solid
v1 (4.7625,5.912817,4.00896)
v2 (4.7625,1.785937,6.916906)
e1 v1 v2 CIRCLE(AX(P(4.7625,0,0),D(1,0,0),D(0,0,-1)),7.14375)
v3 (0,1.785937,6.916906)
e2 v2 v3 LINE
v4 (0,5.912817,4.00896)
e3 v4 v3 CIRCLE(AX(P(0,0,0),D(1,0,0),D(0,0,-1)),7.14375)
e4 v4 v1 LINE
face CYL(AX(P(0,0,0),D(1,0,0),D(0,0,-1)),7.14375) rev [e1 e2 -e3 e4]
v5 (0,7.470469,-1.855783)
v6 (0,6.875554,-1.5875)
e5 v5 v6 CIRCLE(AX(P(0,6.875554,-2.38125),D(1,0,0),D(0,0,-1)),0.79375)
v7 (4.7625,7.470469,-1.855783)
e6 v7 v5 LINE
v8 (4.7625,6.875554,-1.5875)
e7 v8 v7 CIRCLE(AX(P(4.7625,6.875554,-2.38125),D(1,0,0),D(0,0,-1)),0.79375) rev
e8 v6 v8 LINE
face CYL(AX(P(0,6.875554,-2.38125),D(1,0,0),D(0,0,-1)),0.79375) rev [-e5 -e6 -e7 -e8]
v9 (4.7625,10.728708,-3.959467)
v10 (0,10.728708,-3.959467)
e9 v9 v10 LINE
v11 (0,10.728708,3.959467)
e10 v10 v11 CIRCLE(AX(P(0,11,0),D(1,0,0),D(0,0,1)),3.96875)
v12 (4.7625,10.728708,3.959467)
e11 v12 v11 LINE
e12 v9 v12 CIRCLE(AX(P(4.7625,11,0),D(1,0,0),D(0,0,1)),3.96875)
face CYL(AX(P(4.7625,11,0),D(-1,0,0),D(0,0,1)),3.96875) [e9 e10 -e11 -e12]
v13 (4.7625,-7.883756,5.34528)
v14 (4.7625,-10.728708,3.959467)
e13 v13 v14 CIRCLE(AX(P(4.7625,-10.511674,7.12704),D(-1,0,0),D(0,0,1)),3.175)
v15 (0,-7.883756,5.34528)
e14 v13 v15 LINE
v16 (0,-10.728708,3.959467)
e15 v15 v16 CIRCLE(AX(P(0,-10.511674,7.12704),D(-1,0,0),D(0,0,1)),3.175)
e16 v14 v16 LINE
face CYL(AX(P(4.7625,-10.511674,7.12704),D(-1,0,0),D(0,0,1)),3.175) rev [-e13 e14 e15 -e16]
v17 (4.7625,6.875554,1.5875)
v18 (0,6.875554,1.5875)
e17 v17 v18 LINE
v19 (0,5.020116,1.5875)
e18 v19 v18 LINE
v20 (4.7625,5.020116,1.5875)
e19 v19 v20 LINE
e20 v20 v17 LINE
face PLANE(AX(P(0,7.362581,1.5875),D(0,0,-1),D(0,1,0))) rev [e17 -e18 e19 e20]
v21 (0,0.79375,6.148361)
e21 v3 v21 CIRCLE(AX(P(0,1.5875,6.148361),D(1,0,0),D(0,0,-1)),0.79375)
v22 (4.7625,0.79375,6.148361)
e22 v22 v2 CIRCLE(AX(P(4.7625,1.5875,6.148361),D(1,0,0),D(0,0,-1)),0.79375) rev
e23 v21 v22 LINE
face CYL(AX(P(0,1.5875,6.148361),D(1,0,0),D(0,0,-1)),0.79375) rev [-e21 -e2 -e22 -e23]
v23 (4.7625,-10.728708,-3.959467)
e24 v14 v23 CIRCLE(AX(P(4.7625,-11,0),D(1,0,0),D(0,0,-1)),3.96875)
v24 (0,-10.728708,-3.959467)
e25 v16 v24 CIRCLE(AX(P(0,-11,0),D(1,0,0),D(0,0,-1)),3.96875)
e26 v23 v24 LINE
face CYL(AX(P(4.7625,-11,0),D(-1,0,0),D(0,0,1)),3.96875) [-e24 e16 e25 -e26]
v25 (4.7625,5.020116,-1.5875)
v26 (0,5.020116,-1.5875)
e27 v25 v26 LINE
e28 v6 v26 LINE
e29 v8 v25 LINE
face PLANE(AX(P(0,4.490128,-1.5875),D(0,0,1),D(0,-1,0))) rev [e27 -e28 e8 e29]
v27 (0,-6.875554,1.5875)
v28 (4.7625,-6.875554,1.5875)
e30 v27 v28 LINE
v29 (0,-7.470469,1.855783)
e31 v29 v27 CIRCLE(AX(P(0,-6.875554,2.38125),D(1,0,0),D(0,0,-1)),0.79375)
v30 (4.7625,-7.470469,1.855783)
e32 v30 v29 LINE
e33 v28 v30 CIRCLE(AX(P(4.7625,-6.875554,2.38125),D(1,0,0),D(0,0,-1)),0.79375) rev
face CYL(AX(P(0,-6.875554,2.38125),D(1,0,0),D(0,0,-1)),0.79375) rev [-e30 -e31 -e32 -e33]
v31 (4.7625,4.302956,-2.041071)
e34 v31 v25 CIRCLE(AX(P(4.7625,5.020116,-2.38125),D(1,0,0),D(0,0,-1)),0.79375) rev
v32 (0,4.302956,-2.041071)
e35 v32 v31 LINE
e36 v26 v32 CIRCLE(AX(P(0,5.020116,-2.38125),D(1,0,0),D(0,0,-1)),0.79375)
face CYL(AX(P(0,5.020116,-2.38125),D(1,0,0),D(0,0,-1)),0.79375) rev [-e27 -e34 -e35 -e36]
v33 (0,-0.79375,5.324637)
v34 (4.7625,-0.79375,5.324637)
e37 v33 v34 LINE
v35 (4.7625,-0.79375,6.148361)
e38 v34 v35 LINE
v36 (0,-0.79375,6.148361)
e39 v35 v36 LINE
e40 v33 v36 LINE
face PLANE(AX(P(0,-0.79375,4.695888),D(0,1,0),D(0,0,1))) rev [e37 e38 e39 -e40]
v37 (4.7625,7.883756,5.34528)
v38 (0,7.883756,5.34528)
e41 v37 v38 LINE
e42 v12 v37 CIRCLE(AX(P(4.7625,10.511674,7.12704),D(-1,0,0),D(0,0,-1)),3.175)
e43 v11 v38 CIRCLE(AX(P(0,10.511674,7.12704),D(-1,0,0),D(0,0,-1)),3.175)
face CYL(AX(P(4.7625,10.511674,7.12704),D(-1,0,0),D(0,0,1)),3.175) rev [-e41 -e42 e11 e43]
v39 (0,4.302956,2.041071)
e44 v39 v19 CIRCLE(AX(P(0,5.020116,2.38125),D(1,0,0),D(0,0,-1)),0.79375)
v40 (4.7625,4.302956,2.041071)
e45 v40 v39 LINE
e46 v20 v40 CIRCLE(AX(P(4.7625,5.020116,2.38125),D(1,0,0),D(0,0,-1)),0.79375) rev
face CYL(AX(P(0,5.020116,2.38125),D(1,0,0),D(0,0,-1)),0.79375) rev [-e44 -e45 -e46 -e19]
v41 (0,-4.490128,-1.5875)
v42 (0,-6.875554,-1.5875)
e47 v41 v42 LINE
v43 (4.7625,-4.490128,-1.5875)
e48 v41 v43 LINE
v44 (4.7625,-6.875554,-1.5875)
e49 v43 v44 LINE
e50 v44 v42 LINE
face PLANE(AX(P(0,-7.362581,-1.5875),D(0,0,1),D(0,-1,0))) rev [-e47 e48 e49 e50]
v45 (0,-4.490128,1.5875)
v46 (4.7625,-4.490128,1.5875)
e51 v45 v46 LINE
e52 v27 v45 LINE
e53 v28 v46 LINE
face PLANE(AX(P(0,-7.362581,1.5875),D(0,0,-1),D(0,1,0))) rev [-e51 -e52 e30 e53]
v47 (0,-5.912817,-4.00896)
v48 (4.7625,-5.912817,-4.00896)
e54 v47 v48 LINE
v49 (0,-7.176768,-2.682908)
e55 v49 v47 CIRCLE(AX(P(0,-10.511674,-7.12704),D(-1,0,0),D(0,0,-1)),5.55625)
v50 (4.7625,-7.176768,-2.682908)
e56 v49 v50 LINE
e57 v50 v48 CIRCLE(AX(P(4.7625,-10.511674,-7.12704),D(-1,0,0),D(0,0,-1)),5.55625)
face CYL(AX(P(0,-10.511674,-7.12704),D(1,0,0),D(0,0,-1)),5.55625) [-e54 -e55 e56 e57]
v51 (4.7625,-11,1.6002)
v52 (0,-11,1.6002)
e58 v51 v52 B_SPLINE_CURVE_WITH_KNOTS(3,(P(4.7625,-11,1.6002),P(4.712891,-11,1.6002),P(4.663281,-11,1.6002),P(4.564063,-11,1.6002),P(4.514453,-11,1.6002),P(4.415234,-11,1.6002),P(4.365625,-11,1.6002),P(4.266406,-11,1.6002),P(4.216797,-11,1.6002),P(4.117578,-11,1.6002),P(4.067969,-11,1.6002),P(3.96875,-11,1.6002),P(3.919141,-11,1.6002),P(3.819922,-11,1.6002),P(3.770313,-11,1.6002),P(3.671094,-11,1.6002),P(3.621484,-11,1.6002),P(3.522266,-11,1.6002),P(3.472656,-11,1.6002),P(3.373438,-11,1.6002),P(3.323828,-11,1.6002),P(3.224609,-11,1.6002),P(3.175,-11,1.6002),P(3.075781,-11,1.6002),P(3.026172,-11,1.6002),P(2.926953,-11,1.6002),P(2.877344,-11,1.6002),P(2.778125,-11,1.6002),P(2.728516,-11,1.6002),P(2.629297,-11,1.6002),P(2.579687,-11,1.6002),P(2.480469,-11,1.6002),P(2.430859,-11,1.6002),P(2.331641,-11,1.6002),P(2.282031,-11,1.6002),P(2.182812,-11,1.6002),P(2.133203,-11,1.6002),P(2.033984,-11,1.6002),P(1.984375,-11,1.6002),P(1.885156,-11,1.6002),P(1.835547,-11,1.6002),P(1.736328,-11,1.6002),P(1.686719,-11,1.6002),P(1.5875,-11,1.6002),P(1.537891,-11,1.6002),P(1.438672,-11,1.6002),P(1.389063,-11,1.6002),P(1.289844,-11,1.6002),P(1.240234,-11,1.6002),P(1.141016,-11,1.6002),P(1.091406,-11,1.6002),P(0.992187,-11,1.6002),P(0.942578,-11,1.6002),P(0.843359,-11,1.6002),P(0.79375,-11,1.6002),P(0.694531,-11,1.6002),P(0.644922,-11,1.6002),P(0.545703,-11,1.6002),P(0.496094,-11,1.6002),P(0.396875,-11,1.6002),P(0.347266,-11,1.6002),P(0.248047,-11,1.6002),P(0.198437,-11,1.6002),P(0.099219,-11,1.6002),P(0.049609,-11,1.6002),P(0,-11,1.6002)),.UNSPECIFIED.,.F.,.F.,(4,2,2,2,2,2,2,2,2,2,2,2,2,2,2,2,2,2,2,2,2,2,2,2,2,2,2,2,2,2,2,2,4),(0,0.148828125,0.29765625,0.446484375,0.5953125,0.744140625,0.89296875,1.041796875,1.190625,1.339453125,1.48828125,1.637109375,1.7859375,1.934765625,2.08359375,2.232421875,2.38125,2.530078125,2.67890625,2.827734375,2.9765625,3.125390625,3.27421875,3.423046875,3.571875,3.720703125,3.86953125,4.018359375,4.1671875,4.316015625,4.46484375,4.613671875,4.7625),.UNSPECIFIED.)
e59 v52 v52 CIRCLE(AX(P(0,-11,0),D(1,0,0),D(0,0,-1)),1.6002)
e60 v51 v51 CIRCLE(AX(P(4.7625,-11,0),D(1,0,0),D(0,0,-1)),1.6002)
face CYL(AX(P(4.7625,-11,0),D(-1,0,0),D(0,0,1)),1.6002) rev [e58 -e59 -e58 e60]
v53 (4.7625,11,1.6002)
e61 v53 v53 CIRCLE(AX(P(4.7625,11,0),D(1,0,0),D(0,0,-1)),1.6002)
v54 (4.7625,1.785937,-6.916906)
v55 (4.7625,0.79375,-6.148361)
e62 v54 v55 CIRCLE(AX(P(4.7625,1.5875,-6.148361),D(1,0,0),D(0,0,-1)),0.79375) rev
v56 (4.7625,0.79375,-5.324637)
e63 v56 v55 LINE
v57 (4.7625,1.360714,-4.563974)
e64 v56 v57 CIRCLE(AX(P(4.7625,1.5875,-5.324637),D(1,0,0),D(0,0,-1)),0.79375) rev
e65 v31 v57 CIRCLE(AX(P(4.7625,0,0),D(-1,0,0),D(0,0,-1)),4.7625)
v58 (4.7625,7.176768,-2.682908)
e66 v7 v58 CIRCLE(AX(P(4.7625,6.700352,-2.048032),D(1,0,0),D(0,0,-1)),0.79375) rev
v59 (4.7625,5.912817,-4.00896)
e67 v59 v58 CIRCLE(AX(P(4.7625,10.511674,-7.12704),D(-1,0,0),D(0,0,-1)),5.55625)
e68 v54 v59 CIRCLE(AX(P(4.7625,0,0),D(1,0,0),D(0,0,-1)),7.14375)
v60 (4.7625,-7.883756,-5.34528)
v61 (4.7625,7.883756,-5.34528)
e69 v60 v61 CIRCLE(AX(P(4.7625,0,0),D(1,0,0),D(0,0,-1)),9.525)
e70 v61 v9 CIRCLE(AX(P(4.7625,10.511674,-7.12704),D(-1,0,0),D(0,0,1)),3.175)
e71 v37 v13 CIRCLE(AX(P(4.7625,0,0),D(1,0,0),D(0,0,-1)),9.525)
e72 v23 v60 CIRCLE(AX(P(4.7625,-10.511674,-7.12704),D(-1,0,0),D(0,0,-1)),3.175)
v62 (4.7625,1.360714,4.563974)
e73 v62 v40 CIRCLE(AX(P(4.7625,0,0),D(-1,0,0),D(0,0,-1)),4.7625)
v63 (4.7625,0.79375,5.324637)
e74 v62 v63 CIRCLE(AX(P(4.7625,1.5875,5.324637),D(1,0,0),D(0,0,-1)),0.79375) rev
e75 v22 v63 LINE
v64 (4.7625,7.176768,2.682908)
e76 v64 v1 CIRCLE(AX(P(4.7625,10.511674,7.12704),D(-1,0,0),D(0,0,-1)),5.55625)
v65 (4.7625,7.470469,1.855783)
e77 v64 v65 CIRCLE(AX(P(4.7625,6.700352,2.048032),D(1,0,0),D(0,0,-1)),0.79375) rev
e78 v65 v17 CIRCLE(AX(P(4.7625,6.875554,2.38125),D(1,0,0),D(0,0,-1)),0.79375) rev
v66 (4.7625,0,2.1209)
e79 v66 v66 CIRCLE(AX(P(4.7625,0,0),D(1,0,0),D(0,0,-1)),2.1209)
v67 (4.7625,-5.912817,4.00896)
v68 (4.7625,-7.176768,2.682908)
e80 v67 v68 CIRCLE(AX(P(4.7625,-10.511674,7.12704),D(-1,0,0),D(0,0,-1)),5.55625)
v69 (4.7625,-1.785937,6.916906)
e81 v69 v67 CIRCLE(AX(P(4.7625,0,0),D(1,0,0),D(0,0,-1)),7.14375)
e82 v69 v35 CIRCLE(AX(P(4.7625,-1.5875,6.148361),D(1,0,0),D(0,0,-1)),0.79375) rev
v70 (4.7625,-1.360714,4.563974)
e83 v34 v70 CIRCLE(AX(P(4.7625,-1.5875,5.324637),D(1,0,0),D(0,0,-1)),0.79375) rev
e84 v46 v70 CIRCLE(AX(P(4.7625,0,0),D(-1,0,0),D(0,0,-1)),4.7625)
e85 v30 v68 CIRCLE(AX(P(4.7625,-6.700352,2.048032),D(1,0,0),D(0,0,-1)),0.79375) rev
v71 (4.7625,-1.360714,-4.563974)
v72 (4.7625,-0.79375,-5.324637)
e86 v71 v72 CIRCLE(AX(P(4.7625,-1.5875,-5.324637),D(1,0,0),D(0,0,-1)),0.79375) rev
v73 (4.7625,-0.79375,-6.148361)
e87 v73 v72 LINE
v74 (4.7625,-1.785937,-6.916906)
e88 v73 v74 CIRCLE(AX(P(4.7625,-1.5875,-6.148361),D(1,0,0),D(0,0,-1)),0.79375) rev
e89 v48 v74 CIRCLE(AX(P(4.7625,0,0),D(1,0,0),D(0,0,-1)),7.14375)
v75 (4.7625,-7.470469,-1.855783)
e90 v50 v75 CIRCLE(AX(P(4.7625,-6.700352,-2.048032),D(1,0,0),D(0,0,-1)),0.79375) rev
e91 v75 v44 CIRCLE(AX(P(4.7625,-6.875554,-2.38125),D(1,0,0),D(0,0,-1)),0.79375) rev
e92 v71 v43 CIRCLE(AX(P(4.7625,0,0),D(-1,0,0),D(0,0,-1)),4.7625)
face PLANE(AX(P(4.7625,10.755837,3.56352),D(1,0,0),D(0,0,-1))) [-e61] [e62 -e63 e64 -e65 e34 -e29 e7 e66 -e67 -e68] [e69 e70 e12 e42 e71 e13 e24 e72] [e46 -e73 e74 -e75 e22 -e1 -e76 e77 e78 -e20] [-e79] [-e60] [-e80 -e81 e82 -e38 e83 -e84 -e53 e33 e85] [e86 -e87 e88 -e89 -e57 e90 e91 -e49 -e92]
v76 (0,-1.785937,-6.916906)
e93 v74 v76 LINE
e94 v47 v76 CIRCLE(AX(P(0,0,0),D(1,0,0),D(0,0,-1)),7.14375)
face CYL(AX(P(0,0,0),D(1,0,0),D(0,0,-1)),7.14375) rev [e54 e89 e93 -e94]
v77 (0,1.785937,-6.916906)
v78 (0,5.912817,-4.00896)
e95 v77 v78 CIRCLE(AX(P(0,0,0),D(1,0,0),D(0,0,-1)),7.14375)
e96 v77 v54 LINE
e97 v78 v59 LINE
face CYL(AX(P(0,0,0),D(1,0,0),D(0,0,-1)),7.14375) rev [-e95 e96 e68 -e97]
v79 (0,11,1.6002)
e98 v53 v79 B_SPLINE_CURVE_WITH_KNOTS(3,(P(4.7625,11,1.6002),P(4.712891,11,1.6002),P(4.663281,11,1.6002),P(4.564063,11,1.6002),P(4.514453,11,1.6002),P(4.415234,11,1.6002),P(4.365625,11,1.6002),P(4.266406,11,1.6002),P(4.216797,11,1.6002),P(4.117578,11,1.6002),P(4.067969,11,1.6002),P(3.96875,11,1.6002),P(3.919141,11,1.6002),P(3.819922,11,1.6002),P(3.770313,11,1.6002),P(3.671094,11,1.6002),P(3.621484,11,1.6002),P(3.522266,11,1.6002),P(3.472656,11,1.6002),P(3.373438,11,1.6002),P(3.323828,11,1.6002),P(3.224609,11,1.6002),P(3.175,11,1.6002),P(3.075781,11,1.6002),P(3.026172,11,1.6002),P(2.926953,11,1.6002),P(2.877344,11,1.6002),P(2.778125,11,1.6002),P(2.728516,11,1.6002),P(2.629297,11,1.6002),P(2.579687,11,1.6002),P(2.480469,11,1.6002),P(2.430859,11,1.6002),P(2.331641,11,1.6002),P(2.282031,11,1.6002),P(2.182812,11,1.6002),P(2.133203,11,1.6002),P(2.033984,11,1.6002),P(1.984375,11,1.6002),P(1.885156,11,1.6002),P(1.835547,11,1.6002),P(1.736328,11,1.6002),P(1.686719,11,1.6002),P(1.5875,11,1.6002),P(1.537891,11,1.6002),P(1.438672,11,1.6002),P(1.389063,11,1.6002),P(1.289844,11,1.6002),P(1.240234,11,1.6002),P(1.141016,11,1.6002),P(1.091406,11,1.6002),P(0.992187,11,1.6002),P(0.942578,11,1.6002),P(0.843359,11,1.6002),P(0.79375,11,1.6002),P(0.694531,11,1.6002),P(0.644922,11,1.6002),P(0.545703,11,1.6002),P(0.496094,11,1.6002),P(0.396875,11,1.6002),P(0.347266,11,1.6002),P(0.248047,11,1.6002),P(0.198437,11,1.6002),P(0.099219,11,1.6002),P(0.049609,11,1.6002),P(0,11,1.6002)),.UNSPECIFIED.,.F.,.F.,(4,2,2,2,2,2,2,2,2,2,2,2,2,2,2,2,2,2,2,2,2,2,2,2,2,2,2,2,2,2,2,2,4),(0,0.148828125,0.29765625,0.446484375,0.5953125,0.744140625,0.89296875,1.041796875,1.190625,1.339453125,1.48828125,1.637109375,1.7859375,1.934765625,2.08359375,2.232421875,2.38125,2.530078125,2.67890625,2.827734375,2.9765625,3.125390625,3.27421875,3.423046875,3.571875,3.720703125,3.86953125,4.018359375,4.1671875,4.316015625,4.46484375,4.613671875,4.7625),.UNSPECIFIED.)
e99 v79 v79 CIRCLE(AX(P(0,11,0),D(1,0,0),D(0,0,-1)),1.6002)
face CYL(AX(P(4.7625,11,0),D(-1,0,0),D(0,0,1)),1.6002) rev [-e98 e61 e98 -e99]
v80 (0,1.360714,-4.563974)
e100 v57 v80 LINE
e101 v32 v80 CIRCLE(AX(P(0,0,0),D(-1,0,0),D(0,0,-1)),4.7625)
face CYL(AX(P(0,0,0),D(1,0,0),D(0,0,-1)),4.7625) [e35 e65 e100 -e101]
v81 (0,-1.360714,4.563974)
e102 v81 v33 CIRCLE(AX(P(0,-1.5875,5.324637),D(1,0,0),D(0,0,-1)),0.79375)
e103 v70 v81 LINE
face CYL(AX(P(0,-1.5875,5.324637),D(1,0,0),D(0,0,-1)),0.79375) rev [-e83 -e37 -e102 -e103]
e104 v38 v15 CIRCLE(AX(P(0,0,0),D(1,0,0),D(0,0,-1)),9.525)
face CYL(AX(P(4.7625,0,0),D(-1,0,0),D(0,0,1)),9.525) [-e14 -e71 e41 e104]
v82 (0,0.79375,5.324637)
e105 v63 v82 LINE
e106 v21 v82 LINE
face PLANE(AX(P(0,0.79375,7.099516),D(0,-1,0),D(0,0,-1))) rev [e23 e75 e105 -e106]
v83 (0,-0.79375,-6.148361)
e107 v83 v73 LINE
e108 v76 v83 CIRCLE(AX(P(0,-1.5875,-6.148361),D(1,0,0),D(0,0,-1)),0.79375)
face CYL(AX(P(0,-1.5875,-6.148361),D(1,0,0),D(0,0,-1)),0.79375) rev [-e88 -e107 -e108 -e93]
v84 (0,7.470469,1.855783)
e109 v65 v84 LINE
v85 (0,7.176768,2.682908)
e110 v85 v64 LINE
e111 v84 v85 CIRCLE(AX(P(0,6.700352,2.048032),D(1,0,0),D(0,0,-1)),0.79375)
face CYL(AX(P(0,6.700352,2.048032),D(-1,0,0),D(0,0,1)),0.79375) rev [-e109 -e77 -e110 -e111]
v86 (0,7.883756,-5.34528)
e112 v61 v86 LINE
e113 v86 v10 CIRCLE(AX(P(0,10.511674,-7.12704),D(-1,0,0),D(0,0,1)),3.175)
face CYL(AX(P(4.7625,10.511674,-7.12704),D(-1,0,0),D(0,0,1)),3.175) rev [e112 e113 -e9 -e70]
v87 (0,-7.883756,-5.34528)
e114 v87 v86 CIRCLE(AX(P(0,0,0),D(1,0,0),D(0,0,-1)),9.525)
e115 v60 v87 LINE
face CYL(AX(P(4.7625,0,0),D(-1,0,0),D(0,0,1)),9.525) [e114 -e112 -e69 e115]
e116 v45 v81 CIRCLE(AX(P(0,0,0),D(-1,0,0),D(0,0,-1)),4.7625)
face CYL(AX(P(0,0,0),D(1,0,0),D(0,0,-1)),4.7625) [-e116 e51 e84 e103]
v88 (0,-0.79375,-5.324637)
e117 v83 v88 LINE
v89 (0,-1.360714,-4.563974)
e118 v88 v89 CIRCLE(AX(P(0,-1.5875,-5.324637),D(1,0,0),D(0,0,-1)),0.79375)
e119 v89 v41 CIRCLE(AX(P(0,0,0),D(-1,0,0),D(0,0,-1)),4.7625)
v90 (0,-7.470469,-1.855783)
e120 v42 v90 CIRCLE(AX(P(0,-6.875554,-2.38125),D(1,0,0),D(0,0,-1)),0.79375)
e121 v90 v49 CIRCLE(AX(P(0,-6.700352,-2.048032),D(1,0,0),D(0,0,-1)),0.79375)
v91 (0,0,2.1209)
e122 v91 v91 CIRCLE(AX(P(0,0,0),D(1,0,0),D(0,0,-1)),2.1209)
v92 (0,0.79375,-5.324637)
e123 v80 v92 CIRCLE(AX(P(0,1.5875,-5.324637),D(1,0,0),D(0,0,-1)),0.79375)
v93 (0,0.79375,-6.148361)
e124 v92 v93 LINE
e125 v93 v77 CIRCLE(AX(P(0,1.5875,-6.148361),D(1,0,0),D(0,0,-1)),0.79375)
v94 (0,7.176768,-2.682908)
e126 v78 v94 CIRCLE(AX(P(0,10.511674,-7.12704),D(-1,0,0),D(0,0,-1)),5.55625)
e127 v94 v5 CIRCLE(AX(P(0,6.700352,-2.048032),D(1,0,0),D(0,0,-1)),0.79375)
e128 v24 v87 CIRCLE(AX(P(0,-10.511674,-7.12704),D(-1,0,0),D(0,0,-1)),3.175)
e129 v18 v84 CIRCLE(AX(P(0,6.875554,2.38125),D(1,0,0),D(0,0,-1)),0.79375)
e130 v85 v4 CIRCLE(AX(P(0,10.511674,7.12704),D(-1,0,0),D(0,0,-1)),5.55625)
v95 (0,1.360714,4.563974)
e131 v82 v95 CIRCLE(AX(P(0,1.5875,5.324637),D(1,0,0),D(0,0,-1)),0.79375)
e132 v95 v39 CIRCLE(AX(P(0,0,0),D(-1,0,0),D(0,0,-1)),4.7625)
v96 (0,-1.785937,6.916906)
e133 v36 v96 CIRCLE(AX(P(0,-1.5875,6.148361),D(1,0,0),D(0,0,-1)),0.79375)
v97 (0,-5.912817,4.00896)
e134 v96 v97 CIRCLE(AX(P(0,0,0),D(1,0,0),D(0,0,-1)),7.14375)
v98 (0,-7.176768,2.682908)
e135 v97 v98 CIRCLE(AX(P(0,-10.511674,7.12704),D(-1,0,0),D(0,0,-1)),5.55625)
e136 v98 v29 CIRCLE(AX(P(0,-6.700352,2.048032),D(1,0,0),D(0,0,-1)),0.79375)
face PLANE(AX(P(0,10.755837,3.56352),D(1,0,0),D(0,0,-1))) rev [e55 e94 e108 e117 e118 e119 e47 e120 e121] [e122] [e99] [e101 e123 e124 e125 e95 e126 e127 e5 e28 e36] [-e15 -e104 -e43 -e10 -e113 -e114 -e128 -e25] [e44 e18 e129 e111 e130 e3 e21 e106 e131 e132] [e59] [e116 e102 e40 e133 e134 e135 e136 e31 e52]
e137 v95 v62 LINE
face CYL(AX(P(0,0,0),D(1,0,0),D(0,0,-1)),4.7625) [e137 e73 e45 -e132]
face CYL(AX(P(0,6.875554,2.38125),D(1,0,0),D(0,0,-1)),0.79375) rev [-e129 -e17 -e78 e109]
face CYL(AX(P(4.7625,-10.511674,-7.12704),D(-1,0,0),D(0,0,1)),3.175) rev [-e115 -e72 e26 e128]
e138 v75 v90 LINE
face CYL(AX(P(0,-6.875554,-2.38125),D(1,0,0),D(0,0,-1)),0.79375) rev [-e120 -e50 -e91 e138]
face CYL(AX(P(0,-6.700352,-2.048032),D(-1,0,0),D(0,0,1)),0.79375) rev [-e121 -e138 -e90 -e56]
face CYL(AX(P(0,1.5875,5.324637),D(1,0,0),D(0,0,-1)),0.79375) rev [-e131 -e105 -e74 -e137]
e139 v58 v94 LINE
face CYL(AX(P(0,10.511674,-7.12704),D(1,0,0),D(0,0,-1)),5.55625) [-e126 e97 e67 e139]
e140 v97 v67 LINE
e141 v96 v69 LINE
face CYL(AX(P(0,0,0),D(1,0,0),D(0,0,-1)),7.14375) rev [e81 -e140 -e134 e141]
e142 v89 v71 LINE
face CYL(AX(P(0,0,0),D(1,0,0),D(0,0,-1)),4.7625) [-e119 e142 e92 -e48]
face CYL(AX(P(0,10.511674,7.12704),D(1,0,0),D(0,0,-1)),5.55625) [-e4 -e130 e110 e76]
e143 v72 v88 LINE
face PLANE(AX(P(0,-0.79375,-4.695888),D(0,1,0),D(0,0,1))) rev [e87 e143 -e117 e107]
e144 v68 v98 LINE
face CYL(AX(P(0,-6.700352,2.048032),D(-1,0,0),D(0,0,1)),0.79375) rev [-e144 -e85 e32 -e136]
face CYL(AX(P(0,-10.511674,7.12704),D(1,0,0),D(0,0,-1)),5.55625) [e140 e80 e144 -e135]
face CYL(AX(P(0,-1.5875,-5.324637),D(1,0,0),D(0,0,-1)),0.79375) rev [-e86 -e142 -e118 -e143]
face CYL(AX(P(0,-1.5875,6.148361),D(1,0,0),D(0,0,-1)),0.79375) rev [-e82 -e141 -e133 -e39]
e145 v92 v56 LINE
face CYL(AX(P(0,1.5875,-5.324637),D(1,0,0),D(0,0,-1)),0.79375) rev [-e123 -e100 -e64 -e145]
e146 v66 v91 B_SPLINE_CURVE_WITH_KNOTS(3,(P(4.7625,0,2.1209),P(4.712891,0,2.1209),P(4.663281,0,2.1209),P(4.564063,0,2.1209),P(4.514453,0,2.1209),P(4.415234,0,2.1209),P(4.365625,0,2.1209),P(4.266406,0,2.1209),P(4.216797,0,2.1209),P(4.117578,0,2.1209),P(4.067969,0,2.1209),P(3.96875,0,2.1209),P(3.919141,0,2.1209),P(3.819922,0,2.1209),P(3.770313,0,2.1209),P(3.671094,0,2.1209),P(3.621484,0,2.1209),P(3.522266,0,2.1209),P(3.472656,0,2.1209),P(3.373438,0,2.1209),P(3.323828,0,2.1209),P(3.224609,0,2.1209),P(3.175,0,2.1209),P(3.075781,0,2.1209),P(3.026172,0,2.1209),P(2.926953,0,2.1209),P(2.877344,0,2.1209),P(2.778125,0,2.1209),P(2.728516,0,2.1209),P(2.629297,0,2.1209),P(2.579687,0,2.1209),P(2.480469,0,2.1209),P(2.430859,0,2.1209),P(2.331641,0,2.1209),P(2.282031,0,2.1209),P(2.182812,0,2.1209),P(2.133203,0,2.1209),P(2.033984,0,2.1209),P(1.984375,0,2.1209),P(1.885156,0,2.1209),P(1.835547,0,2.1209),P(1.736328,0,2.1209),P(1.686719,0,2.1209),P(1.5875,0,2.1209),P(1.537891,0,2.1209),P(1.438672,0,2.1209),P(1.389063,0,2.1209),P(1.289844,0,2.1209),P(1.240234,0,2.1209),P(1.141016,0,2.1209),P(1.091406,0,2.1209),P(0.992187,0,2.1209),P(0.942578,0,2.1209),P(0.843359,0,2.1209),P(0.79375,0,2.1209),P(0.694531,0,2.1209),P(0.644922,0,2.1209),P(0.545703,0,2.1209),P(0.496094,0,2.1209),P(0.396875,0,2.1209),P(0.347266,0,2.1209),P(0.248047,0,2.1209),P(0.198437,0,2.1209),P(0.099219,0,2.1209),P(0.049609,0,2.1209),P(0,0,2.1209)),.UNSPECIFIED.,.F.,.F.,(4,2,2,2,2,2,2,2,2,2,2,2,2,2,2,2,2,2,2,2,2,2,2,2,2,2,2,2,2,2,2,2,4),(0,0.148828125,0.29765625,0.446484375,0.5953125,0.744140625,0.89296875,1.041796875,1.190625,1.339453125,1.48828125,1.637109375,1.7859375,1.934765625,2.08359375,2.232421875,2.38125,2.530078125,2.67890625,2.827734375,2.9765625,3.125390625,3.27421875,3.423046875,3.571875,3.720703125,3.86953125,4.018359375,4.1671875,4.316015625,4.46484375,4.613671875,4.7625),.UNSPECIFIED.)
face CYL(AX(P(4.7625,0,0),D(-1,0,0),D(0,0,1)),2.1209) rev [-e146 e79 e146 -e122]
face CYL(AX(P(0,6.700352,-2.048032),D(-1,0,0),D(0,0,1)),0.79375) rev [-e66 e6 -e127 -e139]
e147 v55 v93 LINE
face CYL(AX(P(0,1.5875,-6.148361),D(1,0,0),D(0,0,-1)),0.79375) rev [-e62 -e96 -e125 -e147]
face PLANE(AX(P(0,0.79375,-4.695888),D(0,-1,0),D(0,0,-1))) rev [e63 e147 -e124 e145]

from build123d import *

# Parameters (mm, degrees)
SKETCH1_R           = 2.1209000000000002
SKETCH1_R_2         = 1.6002
BOSS_EXTRUDE1_DEPTH = 4.7625
CUT_EXTRUDE1_DEPTH  = 19.370370377662503
FILLET1_R           = 0.79375


with BuildPart() as part:
    # Sketch1 → Boss-Extrude1 (new body)
    with BuildSketch(Plane(origin=(0, 0, 0), x_dir=(0, 0, -1), z_dir=(1, 0, 0))):
        with BuildLine():
            ThreePointArc((-3.9594667824617957, 10.7287079782197), (2.8e-15, 14.96875), (3.9594667824617935, 10.728707978219694))
            ThreePointArc((3.9594667824617935, 10.728707978219694), (4.272672724168048, 9.121274682724051), (5.345280156323423, 7.883755770596593))
            ThreePointArc((5.345280156323423, 7.883755770596593), (9.525, 1.06e-15), (5.345280156323425, -7.883755770596589))
            ThreePointArc((5.345280156323425, -7.883755770596589), (4.272672724168048, -9.12127468272405), (3.9594667824617975, -10.728707978219694))
            ThreePointArc((3.9594667824617975, -10.728707978219694), (2.8e-15, -14.968749999999996), (-3.9594667824617917, -10.7287079782197))
            ThreePointArc((-3.9594667824617917, -10.7287079782197), (-4.272672724168042, -9.121274682724055), (-5.345280156323421, -7.883755770596593))
            ThreePointArc((-5.345280156323421, -7.883755770596593), (-9.524999999999999, -3.06e-15), (-5.345280156323423, 7.883755770596589))
            ThreePointArc((-5.345280156323423, 7.883755770596589), (-4.272672724168045, 9.121274682724053), (-3.9594667824617957, 10.7287079782197))
        make_face()
        with Locations(Location((0, 0, 0), (0, 0, 180))):
            Circle(SKETCH1_R, mode=Mode.SUBTRACT)
        with Locations(Location((0, 11, 0), (0, 0, 180))):
            Circle(SKETCH1_R_2, mode=Mode.SUBTRACT)
        with Locations(Location((0, -11, 0), (0, 0, 180))):
            Circle(SKETCH1_R_2, mode=Mode.SUBTRACT)
    extrude(amount=BOSS_EXTRUDE1_DEPTH)

    # Sketch2 → Cut-Extrude1 (cut, through all)
    with BuildSketch(Plane(origin=(4.7625, 0, 0), x_dir=(0, 0, -1), z_dir=(1, 0, 0))):
        with BuildLine():
            Line((-1.5875000000000001, -7.362580542128799), (-1.5874999999999997, -4.490128060534577))
            ThreePointArc((-1.5874999999999997, -4.490128060534577), (-3.6450027313013944, -3.0651853677722936), (-4.69588832783532, -0.7937500000000003))
            Line((-4.69588832783532, -0.7937500000000003), (-7.09951582856183, -0.7937500000000006))
            ThreePointArc((-7.09951582856183, -0.7937500000000006), (-6.115616956356625, -3.692207104920213), (-4.008960117242562, -5.912816827947443))
            ThreePointArc((-4.008960117242562, -5.912816827947443), (-3.046958974664247, -6.740089655613493), (-2.2977150650912916, -7.764033059168784))
            ThreePointArc((-2.2977150650912916, -7.764033059168784), (-1.9529503466198308, -7.545009188704331), (-1.5875000000000001, -7.362580542128799))
        make_face()
        with BuildLine():
            Line((1.5875000000000001, -7.362580542128799), (1.5874999999999997, -4.490128060534577))
            ThreePointArc((1.5874999999999997, -4.490128060534577), (3.645002731301394, -3.0651853677722944), (4.695888327835319, -0.7937500000000003))
            Line((4.695888327835319, -0.7937500000000003), (7.099515828561831, -0.7937500000000003))
            ThreePointArc((7.099515828561831, -0.7937500000000003), (6.115616956356629, -3.692207104920211), (4.008960117242569, -5.912816827947442))
            ThreePointArc((4.008960117242569, -5.912816827947442), (3.0469589746642507, -6.74008965561349), (2.2977150650912943, -7.764033059168785))
            ThreePointArc((2.2977150650912943, -7.764033059168785), (1.9529503466198321, -7.545009188704331), (1.5875000000000001, -7.362580542128799))
        make_face()
        with BuildLine():
            Line((-7.09951582856183, 0.7937500000000006), (-4.69588832783532, 0.7937500000000003))
            ThreePointArc((-4.69588832783532, 0.7937500000000003), (-3.6450027313013944, 3.0651853677722936), (-1.5874999999999997, 4.490128060534576))
            Line((-1.5874999999999997, 4.490128060534576), (-1.5875000000000004, 7.362580542128802))
            ThreePointArc((-1.5875000000000004, 7.362580542128802), (-1.9529503466198312, 7.545009188704334), (-2.297715065091291, 7.764033059168786))
            ThreePointArc((-2.297715065091291, 7.764033059168786), (-3.046958974664248, 6.74008965561349), (-4.008960117242567, 5.912816827947441))
            ThreePointArc((-4.008960117242567, 5.912816827947441), (-6.115616956356626, 3.692207104920211), (-7.09951582856183, 0.7937500000000006))
        make_face()
        with BuildLine():
            Line((1.5874999999999997, 4.490128060534576), (1.5875000000000004, 7.362580542128802))
            ThreePointArc((1.5875000000000004, 7.362580542128802), (1.9529503466198308, 7.545009188704333), (2.2977150650912908, 7.764033059168786))
            ThreePointArc((2.2977150650912908, 7.764033059168786), (3.04695897466425, 6.740089655613488), (4.0089601172425695, 5.912816827947439))
            ThreePointArc((4.0089601172425695, 5.912816827947439), (6.115616956356628, 3.6922071049202088), (7.09951582856183, 0.7937500000000001))
            Line((7.09951582856183, 0.7937500000000001), (4.695888327835319, 0.7937500000000003))
            ThreePointArc((4.695888327835319, 0.7937500000000003), (3.645002731301393, 3.0651853677722936), (1.5874999999999997, 4.490128060534576))
        make_face()
    extrude(amount=-CUT_EXTRUDE1_DEPTH, mode=Mode.SUBTRACT)

    # Fillet1
    # the kernel refuses this fillet: 0.79375 mm, written as the material it adds along each edge
    with BuildSketch(Plane(origin=(4.7625, -0.79375, -4.69588832783532), x_dir=(0, -0.9739846340944042, 0.2266140607905643), z_dir=(-1, 0, 0))) as fillet1_piece_1:
        with BuildLine():
            CenterArc((0.6306170426342453, -0.7922663309145631), FILLET1_R, 93.50374068607991, 73.39845040097973)
            Line((-0.14248326067818778, -0.612391420162052), (0, 0))
            ThreePointArc((0, 0), (0.2910540196773445, -0.00890201451262073), (0.5821080393546879, 2e-17))
        make_face()
    extrude(amount=4.7625)
    with BuildSketch(Plane(origin=(4.7625, -0.7937500000000003, -7.099515828561831), x_dir=(0, -1.2e-16, 1), z_dir=(-1, 0, 0))) as fillet1_piece_2:
        with BuildLine():
            CenterArc((0.9511547664575569, -0.79375), FILLET1_R, 90.00000000000001, 104.47751218592987)
            ThreePointArc((0.1826096336945221, -0.9921874999999994), (0.07376813927591291, -0.499321331749944), (0, 0))
            Line((0, 0), (0.9511547664575568, 0))
        make_face()
    extrude(amount=4.7625)
    with BuildSketch(Plane(origin=(4.7625, 0.7937500000000004, -7.099515828561831), x_dir=(0, 0.9834817412823682, 0.18100736052492677), z_dir=(-1, 0, 0))) as fillet1_piece_3:
        with BuildLine():
            CenterArc((0.9528046458700647, -0.7917687535280427), FILLET1_R, 85.95092901125643, 104.47751218592998)
            Line((0.17216601372718518, -0.9354433459447041), (0, 0))
            ThreePointArc((0, 0), (0.5044259889900348, 0.01783121824761195), (1.0088519779800686, 3e-17))
        make_face()
    extrude(amount=4.7625)
    with BuildSketch(Plane(origin=(4.7625, 0.7937500000000004, -4.69588832783532), x_dir=(0, -3.5e-16, -1), z_dir=(-1, 0, 0))) as fillet1_piece_4:
        with BuildLine():
            CenterArc((0.6287485435860521, -0.79375), FILLET1_R, 89.99999999999997, 73.39845040097973)
            ThreePointArc((-0.13191386661700052, -0.5669642857142849), (-0.05728650796072109, -0.2854994645150646), (0, 0))
            Line((0, 0), (0.6287485435860525, 0))
        make_face()
    extrude(amount=4.7625)
    with BuildSketch(Plane(origin=(4.7625, 4.490128060534577, -1.5875), x_dir=(0, -0.3814588594181724, -0.9243858169462505), z_dir=(-1, 0, 0))) as fillet1_piece_5:
        with BuildLine():
            CenterArc((0.531562729123544, -0.792696105792815), FILLET1_R, 92.95285644533071, 64.62306647484768)
            Line((-0.2021685130775424, -0.48991313612964066), (0, 0))
            ThreePointArc((0, 0), (0.24533664421086704, -0.00632336524311312), (0.4906732884217341, -2e-17))
        make_face()
    extrude(amount=4.7625)
    with BuildSketch(Plane(origin=(4.7625, 7.764033059168785, -2.2977150650912908), x_dir=(0, -0.5063837713427546, 0.8623082257062661), z_dir=(-1, 0, 0))) as fillet1_piece_6:
        with BuildLine():
            CenterArc((0.7539344065414385, -0.7907853062648578), FILLET1_R, 94.95360014564893, 78.58484225728135)
            ThreePointArc((-0.03477336431713144, -0.7014594159121466), (-0.00629236326442682, -0.35127968530901016), (0, 0))
            ThreePointArc((0, 0), (0.3426974575188369, -0.01482346867571009), (0.685394915037674, 1e-17))
        make_face()
    extrude(amount=4.7625)
    with BuildSketch(Plane(origin=(4.7625, 7.362580542128802, -1.5875000000000004), x_dir=(0, 0.4507075585568903, -0.892671662292294), z_dir=(-1, 0, 0))) as fillet1_piece_7:
        with BuildLine():
            CenterArc((0.4890515947139495, 0.7925039046242565), FILLET1_R, 206.78908923910086, 60.00000000000017)
            Line((-0.21950653723055963, 0.43475478001972634), (0, 0))
            ThreePointArc((0, 0), (0.22229617941543137, 0.00623047687871969), (0.44459235883086456, 0))
        make_face()
    extrude(amount=4.7625)
    with BuildSketch(Plane(origin=(4.7625, 4.490128060534576, 1.5875), x_dir=(0, 1, -4.2e-16), z_dir=(-1, 0, 0))) as fillet1_piece_8:
        with BuildLine():
            CenterArc((0.5299877249827253, -0.79375), FILLET1_R, 89.99999999999997, 64.62306647484775)
            ThreePointArc((-0.1871716729483179, -0.4535714285714287), (-0.08774060732805387, -0.22919781797903635), (0, 0))
            Line((0, 0), (0.5299877249827256, 0))
        make_face()
    extrude(amount=4.7625)
    with BuildSketch(Plane(origin=(4.7625, 7.362580542128802, 1.5875000000000004), x_dir=(0, 0.4507075585568887, 0.8926716622922948), z_dir=(-1, 0, 0))) as fillet1_piece_9:
        with BuildLine():
            CenterArc((0.4890515947139505, -0.7925039046242564), FILLET1_R, 93.21091076089908, 60.000000000000085)
            Line((-0.21950653723055885, -0.43475478001972667), (0, 0))
            ThreePointArc((0, 0), (0.22229617941543217, -0.0062304768787197), (0.4445923588308641, 3e-17))
        make_face()
    extrude(amount=4.7625)
    with BuildSketch(Plane(origin=(4.7625, 7.764033059168787, 2.2977150650912916), x_dir=(0, -0.8361785115671588, 0.5484573791948931), z_dir=(-1, 0, 0))) as fillet1_piece_10:
        with BuildLine():
            CenterArc((0.7524865660320088, -0.79216315106995), FILLET1_R, 93.62356396435027, 78.58484225726829)
            ThreePointArc((-0.03393532877352373, -0.6845542951589412), (-0.0021623763281384, -0.3430110883660692), (0, 0))
            ThreePointArc((0, 0), (0.3511603974816025, -0.01110794251034867), (0.7023207949632068, 0))
        make_face()
    extrude(amount=4.7625)
    with BuildSketch(Plane(origin=(4.7625, 0.7937500000000004, 4.69588832783532), x_dir=(0, 0.9739846340944044, -0.22661406079056337), z_dir=(-1, 0, 0))) as fillet1_piece_11:
        with BuildLine():
            CenterArc((0.6306170426342449, -0.7922663309145632), FILLET1_R, 93.50374068607998, 73.39845040097971)
            Line((-0.14248326067818828, -0.6123914201620527), (0, 0))
            ThreePointArc((0, 0), (0.29105401967734285, -0.00890201451262188), (0.5821080393546864, -1e-17))
        make_face()
    extrude(amount=4.7625)
    with BuildSketch(Plane(origin=(4.7625, -0.79375, 4.69588832783532), x_dir=(0, -7.1e-16, 1), z_dir=(-1, 0, 0))) as fillet1_piece_12:
        with BuildLine():
            CenterArc((0.6287485435860539, -0.79375), FILLET1_R, 90.00000000000004, 73.39845040097977)
            ThreePointArc((-0.13191386661699994, -0.5669642857142864), (-0.05728650796072168, -0.28549946451506575), (0, 0))
            Line((0, 0), (0.6287485435860534, 0))
        make_face()
    extrude(amount=4.7625)
    with BuildSketch(Plane(origin=(4.7625, 0.7937500000000007, 7.099515828561831), x_dir=(0, -3.5e-16, -1), z_dir=(-1, 0, 0))) as fillet1_piece_13:
        with BuildLine():
            CenterArc((0.9511547664575583, -0.79375), FILLET1_R, 89.99999999999997, 104.47751218592998)
            ThreePointArc((0.1826096336945243, -0.9921875000000004), (0.07376813927591445, -0.4993213317499442), (0, 0))
            Line((0, 0), (0.9511547664575586, 0))
        make_face()
    extrude(amount=4.7625)
    with BuildSketch(Plane(origin=(4.7625, -0.7937500000000006, 7.099515828561831), x_dir=(0, -0.9834817412823684, -0.18100736052492664), z_dir=(-1, 0, 0))) as fillet1_piece_14:
        with BuildLine():
            CenterArc((0.9528046458700652, -0.7917687535280429), FILLET1_R, 85.9509290112564, 104.47751218593004)
            Line((0.17216601372718549, -0.9354433459447042), (0, 0))
            ThreePointArc((0, 0), (0.5044259889900345, 0.01783121824761361), (1.0088519779800695, -1e-17))
        make_face()
    extrude(amount=4.7625)
    with BuildSketch(Plane(origin=(4.7625, -7.764033059168784, 2.2977150650912916), x_dir=(0, 0.5063837713427585, -0.862308225706264), z_dir=(-1, 0, 0))) as fillet1_piece_15:
        with BuildLine():
            CenterArc((0.7539344065414401, -0.7907853062648579), FILLET1_R, 94.95360014564929, 78.58484225728117)
            ThreePointArc((-0.03477336431713059, -0.7014594159121491), (-0.00629236326442512, -0.35127968530901216), (0, 0))
            ThreePointArc((0, 0), (0.34269745751883435, -0.01482346867571016), (0.6853949150376707, 0))
        make_face()
    extrude(amount=4.7625)
    with BuildSketch(Plane(origin=(4.7625, -7.362580542128798, 1.5875000000000004), x_dir=(0, -0.4507075585568874, 0.8926716622922954), z_dir=(-1, 0, 0))) as fillet1_piece_16:
        with BuildLine():
            CenterArc((0.48905159471395165, 0.7925039046242556), FILLET1_R, 206.78908923910083, 59.99999999999994)
            Line((-0.2195065372305578, 0.43475478001972623), (0, 0))
            ThreePointArc((0, 0), (0.22229617941543278, 0.00623047687871768), (0.4445923588308635, 1e-17))
        make_face()
    extrude(amount=4.7625)
    with BuildSketch(Plane(origin=(4.7625, -7.362580542128799, -1.5875000000000004), x_dir=(0, -0.4507075585568885, -0.8926716622922948), z_dir=(-1, 0, 0))) as fillet1_piece_17:
        with BuildLine():
            CenterArc((0.4890515947139506, -0.7925039046242561), FILLET1_R, 93.21091076089908, 60.00000000000003)
            Line((-0.21950653723055835, -0.4347547800197259), (0, 0))
            ThreePointArc((0, 0), (0.22229617941543273, -0.00623047687871996), (0.4445923588308643, 1e-17))
        make_face()
    extrude(amount=4.7625)
    with BuildSketch(Plane(origin=(4.7625, -7.764033059168785, -2.297715065091294), x_dir=(0, 0.8361785115671573, -0.5484573791948956), z_dir=(-1, 0, 0))) as fillet1_piece_18:
        with BuildLine():
            CenterArc((0.7524865660320036, -0.7921631510699503), FILLET1_R, 93.62356396435017, 78.58484225726816)
            ThreePointArc((-0.03393532877352819, -0.6845542951589385), (-0.00216237632813965, -0.343011088366068), (0, 0))
            ThreePointArc((0, 0), (0.35116039748160127, -0.01110794251034834), (0.7023207949632029, 3e-17))
        make_face()
    extrude(amount=4.7625)


solid = part.part
